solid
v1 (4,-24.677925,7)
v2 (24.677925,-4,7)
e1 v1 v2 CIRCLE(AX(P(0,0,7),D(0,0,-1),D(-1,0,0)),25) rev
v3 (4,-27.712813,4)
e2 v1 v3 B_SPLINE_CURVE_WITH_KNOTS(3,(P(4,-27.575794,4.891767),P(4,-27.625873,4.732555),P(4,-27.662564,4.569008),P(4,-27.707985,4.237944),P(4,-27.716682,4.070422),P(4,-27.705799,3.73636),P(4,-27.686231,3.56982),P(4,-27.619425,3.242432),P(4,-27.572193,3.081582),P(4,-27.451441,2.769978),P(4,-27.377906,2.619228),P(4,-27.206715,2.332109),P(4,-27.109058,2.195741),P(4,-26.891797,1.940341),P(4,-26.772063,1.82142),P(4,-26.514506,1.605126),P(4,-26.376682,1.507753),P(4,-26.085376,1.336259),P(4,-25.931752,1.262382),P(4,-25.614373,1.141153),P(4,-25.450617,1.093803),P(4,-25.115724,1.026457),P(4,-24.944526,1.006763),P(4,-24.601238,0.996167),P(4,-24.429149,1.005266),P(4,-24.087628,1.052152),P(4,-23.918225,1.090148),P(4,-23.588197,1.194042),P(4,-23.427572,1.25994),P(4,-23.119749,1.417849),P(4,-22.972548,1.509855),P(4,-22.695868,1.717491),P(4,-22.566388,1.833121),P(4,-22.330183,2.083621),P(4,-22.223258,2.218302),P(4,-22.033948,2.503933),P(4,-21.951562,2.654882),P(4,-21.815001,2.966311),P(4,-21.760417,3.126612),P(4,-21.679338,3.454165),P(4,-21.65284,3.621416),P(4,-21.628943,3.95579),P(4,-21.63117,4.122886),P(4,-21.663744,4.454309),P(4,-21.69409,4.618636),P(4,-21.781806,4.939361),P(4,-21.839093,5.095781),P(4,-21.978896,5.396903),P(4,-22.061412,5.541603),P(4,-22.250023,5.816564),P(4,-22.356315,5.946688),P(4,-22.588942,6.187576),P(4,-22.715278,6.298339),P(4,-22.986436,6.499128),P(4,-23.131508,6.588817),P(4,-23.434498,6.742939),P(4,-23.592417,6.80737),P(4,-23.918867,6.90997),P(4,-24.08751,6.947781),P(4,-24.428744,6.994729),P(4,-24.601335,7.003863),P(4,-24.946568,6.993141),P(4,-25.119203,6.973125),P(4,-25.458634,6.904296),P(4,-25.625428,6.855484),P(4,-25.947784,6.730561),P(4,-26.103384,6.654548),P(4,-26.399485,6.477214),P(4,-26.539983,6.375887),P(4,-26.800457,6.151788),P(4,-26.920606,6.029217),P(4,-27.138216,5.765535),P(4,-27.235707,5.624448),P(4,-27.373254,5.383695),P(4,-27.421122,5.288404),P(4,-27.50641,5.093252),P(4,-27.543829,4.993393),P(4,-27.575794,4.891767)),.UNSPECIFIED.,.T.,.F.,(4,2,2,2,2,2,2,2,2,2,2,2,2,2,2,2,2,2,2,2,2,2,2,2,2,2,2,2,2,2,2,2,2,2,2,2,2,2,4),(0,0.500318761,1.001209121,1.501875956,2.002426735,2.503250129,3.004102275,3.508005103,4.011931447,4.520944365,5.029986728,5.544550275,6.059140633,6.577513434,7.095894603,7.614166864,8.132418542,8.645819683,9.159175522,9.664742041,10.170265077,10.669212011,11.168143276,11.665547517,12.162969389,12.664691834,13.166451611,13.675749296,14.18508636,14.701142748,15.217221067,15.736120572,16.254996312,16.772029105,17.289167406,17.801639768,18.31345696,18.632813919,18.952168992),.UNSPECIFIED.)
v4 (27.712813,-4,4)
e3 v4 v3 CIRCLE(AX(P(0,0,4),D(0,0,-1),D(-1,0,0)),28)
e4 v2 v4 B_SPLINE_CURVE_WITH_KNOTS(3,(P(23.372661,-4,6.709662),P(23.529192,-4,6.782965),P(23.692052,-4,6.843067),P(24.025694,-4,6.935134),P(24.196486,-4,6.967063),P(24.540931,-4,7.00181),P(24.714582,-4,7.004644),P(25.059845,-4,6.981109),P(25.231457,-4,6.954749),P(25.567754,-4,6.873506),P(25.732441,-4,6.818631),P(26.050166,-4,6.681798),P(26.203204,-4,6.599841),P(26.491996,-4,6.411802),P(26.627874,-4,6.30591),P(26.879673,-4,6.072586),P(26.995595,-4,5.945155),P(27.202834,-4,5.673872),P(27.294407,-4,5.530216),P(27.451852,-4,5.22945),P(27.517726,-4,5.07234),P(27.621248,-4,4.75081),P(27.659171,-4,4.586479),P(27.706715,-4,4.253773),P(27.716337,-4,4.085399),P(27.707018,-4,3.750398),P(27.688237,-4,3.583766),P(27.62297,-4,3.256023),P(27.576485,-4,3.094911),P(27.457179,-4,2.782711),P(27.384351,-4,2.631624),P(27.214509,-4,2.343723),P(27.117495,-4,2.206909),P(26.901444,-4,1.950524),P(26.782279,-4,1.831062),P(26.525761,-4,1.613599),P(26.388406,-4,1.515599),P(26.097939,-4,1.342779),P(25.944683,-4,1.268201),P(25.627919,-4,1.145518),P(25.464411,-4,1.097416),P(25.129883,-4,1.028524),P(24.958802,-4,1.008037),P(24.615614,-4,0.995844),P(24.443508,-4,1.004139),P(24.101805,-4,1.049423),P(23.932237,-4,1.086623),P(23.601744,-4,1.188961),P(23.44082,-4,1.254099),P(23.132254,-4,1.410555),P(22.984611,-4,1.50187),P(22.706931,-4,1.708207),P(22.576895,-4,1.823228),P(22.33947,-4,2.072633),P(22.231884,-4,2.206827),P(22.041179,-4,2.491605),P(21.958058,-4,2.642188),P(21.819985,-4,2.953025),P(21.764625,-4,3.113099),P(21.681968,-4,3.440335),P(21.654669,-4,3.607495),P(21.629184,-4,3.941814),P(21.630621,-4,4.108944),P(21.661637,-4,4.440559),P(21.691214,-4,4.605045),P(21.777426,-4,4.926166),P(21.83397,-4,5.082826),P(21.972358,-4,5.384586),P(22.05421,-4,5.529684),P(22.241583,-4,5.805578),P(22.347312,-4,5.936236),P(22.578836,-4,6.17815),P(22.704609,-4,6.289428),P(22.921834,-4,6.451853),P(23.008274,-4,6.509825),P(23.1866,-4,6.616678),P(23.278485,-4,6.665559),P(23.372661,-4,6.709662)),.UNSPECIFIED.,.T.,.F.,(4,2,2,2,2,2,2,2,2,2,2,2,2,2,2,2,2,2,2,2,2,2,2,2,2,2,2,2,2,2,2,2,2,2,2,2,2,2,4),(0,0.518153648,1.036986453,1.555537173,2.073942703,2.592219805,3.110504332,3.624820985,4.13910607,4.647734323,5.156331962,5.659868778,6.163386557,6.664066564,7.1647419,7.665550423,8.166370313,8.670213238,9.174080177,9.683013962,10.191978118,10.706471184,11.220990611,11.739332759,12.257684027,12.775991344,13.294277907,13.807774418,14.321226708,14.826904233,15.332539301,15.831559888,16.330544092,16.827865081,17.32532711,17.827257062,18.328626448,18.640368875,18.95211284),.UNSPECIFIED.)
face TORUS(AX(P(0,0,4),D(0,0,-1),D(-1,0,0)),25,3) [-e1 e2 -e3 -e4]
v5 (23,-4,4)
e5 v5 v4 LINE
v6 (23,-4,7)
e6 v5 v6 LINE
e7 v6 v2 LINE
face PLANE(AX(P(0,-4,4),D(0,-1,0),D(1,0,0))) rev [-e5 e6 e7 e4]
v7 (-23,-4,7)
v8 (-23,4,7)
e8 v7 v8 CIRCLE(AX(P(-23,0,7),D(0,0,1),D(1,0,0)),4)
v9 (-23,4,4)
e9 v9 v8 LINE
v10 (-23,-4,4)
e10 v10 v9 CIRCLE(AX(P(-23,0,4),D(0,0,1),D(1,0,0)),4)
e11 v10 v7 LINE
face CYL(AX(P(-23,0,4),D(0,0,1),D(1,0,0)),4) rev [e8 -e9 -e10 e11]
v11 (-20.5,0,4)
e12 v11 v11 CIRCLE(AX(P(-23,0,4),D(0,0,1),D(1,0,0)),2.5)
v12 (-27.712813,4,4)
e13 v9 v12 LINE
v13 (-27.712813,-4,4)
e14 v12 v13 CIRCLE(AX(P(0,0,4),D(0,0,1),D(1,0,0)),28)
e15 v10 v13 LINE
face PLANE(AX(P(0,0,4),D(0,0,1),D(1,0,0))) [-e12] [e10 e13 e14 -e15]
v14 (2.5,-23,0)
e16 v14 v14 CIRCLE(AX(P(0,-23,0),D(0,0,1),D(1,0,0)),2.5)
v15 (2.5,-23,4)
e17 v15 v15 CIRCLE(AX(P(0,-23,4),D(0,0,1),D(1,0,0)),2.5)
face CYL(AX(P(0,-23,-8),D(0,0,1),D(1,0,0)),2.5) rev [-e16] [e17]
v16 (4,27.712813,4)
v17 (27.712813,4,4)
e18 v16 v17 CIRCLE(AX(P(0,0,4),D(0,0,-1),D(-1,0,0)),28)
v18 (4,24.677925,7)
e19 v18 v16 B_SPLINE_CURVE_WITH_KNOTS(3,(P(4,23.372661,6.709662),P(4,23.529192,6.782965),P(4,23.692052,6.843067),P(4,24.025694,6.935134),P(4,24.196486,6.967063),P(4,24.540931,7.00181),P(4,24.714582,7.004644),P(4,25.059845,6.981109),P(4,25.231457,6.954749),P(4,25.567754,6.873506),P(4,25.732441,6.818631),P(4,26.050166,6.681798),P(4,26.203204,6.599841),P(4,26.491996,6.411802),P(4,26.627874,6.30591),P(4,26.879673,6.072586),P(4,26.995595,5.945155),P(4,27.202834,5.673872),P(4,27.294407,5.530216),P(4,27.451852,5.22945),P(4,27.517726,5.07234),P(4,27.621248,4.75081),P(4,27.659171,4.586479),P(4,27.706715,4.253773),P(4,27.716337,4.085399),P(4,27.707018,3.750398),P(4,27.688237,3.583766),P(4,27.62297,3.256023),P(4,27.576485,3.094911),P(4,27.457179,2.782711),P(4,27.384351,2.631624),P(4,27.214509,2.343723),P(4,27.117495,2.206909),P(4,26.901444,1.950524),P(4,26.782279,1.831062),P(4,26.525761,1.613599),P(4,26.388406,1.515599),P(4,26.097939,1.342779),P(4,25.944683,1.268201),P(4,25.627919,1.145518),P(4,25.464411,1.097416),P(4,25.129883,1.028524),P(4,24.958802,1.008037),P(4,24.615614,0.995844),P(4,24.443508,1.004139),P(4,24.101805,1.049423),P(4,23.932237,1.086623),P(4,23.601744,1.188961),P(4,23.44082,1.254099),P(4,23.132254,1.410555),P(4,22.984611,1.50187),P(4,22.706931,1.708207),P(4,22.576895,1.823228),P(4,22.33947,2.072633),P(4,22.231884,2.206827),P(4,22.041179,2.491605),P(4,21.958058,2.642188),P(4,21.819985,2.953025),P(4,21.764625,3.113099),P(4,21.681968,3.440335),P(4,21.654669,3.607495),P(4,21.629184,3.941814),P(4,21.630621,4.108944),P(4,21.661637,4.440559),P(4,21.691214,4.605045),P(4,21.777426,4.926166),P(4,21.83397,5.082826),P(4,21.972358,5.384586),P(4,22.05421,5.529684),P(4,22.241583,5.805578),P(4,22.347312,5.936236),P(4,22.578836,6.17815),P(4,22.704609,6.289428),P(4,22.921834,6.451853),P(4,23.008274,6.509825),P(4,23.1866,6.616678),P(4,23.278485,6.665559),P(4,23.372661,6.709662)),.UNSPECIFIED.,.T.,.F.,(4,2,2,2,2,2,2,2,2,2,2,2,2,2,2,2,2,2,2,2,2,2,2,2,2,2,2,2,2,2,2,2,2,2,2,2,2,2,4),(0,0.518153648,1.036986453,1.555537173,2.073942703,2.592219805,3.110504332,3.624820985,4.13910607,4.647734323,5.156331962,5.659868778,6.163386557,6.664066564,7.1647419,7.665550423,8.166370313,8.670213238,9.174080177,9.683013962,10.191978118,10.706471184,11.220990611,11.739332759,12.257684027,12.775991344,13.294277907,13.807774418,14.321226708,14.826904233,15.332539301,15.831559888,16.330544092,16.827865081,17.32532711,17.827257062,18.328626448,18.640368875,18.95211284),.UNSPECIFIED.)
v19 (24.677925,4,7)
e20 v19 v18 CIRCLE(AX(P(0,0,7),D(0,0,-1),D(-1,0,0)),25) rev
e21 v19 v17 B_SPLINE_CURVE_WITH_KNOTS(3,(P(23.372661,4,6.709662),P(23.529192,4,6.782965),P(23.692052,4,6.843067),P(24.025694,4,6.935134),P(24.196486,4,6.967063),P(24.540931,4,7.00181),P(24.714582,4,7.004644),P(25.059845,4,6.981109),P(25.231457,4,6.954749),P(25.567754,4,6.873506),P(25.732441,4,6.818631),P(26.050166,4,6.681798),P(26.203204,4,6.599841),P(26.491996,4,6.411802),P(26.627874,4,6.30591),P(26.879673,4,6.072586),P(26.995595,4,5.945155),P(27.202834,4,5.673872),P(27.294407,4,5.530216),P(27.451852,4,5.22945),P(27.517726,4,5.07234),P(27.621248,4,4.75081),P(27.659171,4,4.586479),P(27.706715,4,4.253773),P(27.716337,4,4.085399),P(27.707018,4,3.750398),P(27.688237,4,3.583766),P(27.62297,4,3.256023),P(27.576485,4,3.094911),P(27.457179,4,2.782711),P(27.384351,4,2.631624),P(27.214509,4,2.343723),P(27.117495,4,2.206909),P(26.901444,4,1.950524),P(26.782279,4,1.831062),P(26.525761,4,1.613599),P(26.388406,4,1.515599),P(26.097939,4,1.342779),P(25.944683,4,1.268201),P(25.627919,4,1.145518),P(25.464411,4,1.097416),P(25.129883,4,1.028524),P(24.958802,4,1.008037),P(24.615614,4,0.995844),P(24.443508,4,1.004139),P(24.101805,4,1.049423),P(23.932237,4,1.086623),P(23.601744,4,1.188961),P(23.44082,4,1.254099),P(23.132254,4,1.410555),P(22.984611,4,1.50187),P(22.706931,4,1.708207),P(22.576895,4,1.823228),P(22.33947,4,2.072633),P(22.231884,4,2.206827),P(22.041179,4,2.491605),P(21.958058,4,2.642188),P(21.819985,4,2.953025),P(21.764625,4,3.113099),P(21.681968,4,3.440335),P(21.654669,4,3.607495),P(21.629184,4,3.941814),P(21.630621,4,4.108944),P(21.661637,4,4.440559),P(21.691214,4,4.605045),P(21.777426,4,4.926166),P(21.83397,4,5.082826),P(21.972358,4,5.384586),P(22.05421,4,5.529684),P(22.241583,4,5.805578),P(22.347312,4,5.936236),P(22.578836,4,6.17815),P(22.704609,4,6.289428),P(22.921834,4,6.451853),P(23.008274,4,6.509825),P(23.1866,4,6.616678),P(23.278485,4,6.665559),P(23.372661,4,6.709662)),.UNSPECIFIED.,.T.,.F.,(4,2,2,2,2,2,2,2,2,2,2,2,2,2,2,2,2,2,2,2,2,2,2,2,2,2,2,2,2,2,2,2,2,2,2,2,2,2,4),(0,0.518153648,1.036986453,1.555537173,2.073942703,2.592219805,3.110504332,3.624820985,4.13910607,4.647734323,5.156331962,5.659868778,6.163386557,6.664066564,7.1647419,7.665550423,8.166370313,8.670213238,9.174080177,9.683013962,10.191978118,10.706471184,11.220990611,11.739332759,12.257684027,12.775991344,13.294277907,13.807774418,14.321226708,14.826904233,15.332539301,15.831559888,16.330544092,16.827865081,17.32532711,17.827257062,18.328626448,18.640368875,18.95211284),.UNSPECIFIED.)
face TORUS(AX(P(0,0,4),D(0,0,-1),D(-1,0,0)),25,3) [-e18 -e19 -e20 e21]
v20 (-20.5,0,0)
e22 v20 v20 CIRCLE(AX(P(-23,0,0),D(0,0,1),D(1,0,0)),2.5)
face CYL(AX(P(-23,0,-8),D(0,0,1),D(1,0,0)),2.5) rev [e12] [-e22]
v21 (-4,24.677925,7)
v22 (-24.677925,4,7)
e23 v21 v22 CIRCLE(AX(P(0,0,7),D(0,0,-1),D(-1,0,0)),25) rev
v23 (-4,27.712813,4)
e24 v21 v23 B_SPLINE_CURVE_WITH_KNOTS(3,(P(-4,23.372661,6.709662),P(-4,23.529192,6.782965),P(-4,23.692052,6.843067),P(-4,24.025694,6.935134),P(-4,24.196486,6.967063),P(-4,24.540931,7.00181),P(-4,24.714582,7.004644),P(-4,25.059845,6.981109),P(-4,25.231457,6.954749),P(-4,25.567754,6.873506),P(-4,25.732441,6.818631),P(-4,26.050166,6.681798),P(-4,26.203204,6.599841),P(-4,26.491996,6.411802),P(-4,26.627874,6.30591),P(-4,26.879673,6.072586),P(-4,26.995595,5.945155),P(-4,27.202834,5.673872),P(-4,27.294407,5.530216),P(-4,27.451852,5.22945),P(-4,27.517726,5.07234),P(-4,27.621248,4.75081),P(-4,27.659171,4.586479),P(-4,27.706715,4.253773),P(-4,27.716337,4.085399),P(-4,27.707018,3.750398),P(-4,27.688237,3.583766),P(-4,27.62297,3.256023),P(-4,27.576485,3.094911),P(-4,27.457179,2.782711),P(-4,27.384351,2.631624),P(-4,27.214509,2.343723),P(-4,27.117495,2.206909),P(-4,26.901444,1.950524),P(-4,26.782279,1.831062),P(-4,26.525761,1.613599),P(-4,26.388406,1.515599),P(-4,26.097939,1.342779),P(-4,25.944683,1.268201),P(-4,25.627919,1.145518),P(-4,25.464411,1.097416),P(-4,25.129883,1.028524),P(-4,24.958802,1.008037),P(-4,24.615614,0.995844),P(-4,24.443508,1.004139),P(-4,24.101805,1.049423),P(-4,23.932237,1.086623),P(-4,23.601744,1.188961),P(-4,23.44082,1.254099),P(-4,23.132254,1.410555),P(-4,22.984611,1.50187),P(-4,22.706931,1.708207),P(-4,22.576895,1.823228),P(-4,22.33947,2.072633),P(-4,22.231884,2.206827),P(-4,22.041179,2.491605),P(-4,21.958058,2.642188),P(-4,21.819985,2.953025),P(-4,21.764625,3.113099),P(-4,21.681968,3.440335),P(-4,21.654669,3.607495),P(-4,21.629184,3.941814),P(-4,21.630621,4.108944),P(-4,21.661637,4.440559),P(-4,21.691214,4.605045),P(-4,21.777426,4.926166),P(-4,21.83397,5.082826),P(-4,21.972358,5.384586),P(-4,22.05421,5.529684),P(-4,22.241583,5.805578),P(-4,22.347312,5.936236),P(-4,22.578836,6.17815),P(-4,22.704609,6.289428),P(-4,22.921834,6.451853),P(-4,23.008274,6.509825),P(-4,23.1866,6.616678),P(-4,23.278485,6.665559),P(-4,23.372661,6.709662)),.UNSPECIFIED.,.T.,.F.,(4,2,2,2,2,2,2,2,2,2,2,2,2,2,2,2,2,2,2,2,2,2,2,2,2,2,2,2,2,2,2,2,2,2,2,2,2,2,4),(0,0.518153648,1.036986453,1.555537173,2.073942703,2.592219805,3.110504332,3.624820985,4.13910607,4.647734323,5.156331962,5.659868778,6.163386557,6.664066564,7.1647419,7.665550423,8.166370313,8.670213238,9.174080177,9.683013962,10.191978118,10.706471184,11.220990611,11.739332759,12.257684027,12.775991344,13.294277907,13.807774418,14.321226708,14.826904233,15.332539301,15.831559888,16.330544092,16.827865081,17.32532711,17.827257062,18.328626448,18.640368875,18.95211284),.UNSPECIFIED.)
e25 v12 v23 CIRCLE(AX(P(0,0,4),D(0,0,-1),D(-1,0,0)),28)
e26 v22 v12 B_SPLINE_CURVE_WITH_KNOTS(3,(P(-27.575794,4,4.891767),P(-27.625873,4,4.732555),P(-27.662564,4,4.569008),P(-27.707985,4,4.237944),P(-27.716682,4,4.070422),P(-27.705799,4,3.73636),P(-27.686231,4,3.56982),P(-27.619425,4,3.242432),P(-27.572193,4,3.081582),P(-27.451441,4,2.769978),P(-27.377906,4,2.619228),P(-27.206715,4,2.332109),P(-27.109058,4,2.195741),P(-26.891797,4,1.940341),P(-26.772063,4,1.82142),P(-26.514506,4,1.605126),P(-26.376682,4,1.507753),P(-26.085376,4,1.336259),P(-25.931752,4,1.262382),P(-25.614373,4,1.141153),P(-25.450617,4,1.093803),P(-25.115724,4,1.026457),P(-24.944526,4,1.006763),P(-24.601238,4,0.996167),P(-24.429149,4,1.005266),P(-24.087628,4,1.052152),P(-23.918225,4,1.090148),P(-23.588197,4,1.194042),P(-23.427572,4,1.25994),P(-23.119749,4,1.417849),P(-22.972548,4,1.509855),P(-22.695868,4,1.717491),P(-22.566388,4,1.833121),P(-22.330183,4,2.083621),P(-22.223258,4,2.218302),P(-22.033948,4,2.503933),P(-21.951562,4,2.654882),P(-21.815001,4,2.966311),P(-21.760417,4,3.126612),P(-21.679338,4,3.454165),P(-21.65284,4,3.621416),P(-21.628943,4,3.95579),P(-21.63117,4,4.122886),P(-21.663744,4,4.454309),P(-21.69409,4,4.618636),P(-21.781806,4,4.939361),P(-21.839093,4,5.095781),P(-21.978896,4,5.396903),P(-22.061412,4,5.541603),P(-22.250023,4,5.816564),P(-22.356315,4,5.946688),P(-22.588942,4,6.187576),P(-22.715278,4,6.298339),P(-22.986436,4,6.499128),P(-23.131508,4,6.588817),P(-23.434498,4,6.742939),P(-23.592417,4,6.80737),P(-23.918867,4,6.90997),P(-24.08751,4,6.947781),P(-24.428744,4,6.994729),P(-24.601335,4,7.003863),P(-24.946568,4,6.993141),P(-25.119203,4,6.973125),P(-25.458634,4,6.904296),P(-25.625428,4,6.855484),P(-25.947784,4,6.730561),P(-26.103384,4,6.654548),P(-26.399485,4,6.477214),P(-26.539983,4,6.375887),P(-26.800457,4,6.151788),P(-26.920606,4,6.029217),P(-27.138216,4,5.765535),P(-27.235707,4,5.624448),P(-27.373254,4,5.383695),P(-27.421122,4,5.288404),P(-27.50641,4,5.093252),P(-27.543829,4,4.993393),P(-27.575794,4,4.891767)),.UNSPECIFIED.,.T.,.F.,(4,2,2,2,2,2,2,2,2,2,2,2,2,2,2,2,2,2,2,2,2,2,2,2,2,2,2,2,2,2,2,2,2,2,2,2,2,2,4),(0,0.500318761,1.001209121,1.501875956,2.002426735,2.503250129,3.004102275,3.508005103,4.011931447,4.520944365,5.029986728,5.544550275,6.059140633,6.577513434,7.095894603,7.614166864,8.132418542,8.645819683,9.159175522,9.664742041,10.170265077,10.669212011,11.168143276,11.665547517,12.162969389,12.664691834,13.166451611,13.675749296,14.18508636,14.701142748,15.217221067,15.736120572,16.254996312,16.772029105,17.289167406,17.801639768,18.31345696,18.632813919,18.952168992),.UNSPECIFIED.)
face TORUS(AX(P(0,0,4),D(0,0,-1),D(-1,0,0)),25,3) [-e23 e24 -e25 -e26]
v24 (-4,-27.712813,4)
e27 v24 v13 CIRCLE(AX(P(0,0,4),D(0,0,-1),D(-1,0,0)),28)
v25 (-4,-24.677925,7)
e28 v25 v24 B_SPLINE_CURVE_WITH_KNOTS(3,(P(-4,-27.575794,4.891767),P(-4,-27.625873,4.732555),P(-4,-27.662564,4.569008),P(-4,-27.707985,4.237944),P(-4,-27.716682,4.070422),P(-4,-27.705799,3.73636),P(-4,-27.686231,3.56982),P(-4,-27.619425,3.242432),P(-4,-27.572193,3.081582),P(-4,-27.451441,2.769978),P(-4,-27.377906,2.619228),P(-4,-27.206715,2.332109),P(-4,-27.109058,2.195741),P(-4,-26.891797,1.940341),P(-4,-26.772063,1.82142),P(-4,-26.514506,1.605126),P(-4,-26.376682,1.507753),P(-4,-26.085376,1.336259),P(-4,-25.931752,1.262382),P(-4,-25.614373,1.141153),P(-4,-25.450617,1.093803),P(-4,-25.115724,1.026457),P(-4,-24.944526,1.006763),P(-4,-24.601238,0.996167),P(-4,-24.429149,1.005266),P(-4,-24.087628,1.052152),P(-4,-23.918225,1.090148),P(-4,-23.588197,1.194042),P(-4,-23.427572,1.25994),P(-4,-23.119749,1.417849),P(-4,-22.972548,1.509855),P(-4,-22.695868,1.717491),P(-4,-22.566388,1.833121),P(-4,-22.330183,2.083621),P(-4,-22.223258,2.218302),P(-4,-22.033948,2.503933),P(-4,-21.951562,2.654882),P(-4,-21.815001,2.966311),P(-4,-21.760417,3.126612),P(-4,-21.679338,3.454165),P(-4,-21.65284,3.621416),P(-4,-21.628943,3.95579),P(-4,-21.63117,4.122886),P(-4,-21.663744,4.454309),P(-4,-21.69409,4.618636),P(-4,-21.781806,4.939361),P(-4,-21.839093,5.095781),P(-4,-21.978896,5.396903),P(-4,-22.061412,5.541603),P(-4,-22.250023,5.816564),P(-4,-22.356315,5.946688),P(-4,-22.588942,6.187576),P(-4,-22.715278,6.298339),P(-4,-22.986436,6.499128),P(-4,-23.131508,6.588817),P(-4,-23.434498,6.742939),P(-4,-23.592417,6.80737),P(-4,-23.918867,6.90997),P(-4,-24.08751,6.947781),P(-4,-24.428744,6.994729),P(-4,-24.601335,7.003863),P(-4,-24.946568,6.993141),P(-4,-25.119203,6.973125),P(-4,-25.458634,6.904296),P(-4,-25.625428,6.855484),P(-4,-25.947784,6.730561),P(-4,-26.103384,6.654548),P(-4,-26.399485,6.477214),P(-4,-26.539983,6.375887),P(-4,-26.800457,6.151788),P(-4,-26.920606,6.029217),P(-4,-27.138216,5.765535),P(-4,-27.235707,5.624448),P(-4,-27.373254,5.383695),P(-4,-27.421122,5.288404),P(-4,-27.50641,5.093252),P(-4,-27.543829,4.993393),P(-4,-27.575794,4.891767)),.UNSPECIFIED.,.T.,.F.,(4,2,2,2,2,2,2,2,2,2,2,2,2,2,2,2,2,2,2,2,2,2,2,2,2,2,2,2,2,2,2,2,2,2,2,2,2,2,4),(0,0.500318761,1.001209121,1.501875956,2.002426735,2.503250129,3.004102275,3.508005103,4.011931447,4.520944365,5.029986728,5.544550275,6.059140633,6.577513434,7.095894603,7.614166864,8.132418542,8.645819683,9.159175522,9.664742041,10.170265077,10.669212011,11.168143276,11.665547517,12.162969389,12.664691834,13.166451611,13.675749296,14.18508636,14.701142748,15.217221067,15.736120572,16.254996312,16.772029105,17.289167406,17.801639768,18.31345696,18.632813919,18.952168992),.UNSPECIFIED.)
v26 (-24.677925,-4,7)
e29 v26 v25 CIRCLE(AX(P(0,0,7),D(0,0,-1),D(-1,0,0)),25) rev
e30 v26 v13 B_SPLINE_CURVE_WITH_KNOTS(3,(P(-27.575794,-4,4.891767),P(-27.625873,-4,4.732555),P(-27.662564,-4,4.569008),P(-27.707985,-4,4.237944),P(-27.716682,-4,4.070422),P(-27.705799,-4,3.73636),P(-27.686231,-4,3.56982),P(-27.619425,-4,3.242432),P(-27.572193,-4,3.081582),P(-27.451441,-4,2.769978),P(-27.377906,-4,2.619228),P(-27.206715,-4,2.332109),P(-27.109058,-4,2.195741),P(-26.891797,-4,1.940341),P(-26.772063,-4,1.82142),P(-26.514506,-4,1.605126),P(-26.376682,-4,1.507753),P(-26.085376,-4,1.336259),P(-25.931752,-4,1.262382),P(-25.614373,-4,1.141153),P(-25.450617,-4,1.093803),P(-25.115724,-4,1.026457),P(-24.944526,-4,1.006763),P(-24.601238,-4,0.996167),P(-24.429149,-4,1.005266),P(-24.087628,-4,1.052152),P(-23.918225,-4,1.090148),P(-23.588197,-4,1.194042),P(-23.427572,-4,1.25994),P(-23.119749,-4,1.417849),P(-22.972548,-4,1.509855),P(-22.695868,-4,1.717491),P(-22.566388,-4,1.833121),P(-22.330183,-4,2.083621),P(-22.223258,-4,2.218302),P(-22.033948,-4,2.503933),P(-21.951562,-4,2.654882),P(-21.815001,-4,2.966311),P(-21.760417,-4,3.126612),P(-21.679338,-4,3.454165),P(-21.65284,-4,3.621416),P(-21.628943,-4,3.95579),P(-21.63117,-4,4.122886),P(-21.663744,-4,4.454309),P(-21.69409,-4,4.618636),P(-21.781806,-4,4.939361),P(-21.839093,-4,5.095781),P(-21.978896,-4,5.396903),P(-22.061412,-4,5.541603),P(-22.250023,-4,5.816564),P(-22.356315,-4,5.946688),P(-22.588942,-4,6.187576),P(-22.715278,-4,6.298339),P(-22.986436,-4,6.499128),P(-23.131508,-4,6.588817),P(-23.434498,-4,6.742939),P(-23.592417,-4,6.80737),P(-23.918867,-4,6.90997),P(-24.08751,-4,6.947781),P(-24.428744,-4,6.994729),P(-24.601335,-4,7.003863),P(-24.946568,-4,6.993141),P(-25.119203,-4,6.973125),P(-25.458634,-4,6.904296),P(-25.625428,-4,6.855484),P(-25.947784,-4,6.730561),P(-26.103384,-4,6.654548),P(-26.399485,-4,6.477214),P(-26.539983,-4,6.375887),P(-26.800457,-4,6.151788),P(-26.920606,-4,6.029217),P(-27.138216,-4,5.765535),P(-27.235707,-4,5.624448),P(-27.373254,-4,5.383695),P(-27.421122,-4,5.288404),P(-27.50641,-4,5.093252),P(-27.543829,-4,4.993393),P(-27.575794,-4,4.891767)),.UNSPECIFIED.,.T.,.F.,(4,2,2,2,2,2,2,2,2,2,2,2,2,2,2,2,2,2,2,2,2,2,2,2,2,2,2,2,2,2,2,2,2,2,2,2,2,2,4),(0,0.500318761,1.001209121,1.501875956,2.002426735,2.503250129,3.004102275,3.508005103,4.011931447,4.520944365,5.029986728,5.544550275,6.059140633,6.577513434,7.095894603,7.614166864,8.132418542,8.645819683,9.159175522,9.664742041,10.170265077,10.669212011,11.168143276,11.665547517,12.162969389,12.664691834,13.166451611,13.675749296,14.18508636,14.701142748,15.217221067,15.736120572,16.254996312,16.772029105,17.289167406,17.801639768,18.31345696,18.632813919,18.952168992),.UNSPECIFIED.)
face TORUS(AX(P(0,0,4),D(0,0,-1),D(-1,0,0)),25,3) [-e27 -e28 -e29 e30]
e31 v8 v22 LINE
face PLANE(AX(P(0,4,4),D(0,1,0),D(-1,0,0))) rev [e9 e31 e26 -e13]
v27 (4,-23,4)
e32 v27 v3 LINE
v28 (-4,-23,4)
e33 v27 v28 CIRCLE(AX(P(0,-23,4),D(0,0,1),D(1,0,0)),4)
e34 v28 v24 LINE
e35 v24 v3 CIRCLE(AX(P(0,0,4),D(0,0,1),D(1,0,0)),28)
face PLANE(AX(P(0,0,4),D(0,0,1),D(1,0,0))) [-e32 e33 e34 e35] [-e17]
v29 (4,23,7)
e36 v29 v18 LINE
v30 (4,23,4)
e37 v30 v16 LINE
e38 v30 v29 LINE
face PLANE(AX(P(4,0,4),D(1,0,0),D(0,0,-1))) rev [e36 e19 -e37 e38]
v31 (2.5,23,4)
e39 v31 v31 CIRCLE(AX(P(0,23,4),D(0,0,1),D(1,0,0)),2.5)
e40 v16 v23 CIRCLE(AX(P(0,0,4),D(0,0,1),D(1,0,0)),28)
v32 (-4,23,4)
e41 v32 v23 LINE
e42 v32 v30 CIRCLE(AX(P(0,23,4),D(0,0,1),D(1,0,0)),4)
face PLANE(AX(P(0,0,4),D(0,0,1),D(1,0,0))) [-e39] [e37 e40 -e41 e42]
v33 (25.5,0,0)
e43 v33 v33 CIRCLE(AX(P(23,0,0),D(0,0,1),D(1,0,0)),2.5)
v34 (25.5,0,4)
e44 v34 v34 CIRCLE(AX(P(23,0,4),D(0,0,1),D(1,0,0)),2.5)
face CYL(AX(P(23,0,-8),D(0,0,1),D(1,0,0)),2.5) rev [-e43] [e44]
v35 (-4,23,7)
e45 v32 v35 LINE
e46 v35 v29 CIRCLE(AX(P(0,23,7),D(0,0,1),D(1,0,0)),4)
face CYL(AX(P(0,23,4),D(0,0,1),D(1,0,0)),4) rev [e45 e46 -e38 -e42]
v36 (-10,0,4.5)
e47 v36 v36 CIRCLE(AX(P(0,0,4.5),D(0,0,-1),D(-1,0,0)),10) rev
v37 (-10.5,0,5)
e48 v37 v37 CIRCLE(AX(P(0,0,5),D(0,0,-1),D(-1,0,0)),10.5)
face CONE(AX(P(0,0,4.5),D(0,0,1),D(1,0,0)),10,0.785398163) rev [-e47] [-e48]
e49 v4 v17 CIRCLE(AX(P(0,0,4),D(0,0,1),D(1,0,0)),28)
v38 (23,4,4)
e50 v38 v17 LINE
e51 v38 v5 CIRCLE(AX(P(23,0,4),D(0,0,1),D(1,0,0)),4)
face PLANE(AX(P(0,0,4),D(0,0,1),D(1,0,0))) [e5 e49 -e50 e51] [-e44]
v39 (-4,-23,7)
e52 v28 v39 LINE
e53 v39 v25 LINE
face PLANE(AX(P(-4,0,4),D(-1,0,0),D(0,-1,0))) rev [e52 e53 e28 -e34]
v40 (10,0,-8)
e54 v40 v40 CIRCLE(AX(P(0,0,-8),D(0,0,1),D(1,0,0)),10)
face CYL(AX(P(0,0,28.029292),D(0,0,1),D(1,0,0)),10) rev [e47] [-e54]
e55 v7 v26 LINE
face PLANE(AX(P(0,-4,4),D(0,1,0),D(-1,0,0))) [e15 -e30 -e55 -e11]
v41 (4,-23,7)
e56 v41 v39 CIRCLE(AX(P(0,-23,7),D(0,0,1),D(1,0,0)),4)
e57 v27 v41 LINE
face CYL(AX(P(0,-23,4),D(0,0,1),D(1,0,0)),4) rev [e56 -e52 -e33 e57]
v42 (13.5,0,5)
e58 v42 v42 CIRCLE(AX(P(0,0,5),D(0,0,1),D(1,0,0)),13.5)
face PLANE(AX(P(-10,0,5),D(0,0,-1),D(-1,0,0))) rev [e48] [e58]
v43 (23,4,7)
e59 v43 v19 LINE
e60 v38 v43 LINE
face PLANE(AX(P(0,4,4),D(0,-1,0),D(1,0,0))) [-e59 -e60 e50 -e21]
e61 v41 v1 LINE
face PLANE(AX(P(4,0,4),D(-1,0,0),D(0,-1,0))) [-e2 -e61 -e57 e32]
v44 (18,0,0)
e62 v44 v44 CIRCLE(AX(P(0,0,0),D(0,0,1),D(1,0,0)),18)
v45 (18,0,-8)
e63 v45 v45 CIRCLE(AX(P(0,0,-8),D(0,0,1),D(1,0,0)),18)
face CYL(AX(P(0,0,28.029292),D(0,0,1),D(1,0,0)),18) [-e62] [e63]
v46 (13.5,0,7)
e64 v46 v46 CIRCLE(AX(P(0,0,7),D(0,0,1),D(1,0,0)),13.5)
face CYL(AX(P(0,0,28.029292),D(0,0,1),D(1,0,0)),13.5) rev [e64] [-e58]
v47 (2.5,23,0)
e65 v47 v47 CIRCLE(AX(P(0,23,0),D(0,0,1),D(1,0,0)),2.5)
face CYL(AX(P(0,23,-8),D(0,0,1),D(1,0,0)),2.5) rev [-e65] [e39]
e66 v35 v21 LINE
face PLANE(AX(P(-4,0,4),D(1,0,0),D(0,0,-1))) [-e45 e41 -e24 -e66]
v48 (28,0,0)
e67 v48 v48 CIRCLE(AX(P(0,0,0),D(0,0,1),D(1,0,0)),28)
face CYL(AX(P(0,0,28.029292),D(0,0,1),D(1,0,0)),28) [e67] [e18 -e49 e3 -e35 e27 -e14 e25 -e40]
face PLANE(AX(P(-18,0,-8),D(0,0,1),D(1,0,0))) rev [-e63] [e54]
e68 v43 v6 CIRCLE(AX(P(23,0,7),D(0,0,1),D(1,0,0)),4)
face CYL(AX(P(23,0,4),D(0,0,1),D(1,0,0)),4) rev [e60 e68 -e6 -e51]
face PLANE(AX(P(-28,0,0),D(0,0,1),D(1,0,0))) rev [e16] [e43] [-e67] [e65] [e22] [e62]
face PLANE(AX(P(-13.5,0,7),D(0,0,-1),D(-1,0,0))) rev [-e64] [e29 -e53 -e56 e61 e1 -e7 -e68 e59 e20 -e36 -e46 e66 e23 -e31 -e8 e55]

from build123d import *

# Parameters (mm, degrees)
FILLET1_R               = 3
CHAMFER1_SIZE           = 0.5
CUT_EXTRUDE2_START      = -3
CUT_EXTRUDE2_DEPTH      = 3
CUT_EXTRUDE3_DEPTH      = 43.343830719
CUT_EXTRUDE3_DEPTH_BACK = 43.343830719
SKETCH3_4_R             = 2.5


with BuildPart() as part:
    # Sketch2 → Revolve1 (revolve)
    with BuildSketch(Plane(origin=(0, 0, 0), x_dir=(-1, 0, 0), z_dir=(0, 1, 0))):
        Polygon((13.5, 7), (28, 7), (28, 0), (18, 0), (18, -8), (10, -8), (10, 5), (13.5, 5), align=None)
    revolve(axis=Axis((0, 0, 28.029292285), (0, 0, -1)))

    # Fillet1
    fillet1_edges = [part.edges().sort_by_distance(p)[0] for p in [
        (28, 0, 7),
    ]]
    fillet(fillet1_edges, radius=FILLET1_R)

    # Chamfer1
    chamfer1_edges = [part.edges().sort_by_distance(p)[0] for p in [
        (10, 0, 5),
    ]]
    chamfer(chamfer1_edges, length=CHAMFER1_SIZE)

    # Sketch3 → Cut-Extrude2 (cut)
    with BuildSketch(Plane.XY.offset(7).offset(CUT_EXTRUDE2_START)):
        with BuildLine():
            ThreePointArc((-4, 23), (0, 19), (4, 23))
            Line((4, 23), (4, 27.712812921))
            ThreePointArc((4, 27.712812921), (0, 28), (-4, 27.712812921))
            Line((-4, 27.712812921), (-4, 23))
        make_face()
        with BuildLine():
            Line((-27.712812921, -4), (-23, -4))
            ThreePointArc((-23, -4), (-19, 0), (-23, 4))
            Line((-23, 4), (-27.712812921, 4))
            ThreePointArc((-27.712812921, 4), (-28, 0), (-27.712812921, -4))
        make_face()
        with BuildLine():
            Line((23, -4), (27.712812921, -4))
            ThreePointArc((27.712812921, -4), (28, 0), (27.712812921, 4))
            Line((27.712812921, 4), (23, 4))
            ThreePointArc((23, 4), (19, 0), (23, -4))
        make_face()
        with BuildLine():
            Line((4, -27.712812921), (4, -23))
            ThreePointArc((4, -23), (0, -19), (-4, -23))
            Line((-4, -23), (-4, -27.712812921))
            ThreePointArc((-4, -27.712812921), (0, -28), (4, -27.712812921))
        make_face()
    extrude(amount=CUT_EXTRUDE2_DEPTH, mode=Mode.SUBTRACT)

    # Sketch3<4> → Cut-Extrude3 (cut, two sides: drawn at the far end of the back side and taken through both)
    with BuildSketch(Plane.XY.offset(7).offset(-CUT_EXTRUDE3_DEPTH_BACK)):
        with Locations((0, 23)):
            Circle(SKETCH3_4_R)
        with Locations((-23, 0)):
            Circle(SKETCH3_4_R)
        with Locations((23, 0)):
            Circle(SKETCH3_4_R)
        with Locations((0, -23)):
            Circle(SKETCH3_4_R)
    extrude(amount=CUT_EXTRUDE3_DEPTH + CUT_EXTRUDE3_DEPTH_BACK, mode=Mode.SUBTRACT)


solid = part.part
